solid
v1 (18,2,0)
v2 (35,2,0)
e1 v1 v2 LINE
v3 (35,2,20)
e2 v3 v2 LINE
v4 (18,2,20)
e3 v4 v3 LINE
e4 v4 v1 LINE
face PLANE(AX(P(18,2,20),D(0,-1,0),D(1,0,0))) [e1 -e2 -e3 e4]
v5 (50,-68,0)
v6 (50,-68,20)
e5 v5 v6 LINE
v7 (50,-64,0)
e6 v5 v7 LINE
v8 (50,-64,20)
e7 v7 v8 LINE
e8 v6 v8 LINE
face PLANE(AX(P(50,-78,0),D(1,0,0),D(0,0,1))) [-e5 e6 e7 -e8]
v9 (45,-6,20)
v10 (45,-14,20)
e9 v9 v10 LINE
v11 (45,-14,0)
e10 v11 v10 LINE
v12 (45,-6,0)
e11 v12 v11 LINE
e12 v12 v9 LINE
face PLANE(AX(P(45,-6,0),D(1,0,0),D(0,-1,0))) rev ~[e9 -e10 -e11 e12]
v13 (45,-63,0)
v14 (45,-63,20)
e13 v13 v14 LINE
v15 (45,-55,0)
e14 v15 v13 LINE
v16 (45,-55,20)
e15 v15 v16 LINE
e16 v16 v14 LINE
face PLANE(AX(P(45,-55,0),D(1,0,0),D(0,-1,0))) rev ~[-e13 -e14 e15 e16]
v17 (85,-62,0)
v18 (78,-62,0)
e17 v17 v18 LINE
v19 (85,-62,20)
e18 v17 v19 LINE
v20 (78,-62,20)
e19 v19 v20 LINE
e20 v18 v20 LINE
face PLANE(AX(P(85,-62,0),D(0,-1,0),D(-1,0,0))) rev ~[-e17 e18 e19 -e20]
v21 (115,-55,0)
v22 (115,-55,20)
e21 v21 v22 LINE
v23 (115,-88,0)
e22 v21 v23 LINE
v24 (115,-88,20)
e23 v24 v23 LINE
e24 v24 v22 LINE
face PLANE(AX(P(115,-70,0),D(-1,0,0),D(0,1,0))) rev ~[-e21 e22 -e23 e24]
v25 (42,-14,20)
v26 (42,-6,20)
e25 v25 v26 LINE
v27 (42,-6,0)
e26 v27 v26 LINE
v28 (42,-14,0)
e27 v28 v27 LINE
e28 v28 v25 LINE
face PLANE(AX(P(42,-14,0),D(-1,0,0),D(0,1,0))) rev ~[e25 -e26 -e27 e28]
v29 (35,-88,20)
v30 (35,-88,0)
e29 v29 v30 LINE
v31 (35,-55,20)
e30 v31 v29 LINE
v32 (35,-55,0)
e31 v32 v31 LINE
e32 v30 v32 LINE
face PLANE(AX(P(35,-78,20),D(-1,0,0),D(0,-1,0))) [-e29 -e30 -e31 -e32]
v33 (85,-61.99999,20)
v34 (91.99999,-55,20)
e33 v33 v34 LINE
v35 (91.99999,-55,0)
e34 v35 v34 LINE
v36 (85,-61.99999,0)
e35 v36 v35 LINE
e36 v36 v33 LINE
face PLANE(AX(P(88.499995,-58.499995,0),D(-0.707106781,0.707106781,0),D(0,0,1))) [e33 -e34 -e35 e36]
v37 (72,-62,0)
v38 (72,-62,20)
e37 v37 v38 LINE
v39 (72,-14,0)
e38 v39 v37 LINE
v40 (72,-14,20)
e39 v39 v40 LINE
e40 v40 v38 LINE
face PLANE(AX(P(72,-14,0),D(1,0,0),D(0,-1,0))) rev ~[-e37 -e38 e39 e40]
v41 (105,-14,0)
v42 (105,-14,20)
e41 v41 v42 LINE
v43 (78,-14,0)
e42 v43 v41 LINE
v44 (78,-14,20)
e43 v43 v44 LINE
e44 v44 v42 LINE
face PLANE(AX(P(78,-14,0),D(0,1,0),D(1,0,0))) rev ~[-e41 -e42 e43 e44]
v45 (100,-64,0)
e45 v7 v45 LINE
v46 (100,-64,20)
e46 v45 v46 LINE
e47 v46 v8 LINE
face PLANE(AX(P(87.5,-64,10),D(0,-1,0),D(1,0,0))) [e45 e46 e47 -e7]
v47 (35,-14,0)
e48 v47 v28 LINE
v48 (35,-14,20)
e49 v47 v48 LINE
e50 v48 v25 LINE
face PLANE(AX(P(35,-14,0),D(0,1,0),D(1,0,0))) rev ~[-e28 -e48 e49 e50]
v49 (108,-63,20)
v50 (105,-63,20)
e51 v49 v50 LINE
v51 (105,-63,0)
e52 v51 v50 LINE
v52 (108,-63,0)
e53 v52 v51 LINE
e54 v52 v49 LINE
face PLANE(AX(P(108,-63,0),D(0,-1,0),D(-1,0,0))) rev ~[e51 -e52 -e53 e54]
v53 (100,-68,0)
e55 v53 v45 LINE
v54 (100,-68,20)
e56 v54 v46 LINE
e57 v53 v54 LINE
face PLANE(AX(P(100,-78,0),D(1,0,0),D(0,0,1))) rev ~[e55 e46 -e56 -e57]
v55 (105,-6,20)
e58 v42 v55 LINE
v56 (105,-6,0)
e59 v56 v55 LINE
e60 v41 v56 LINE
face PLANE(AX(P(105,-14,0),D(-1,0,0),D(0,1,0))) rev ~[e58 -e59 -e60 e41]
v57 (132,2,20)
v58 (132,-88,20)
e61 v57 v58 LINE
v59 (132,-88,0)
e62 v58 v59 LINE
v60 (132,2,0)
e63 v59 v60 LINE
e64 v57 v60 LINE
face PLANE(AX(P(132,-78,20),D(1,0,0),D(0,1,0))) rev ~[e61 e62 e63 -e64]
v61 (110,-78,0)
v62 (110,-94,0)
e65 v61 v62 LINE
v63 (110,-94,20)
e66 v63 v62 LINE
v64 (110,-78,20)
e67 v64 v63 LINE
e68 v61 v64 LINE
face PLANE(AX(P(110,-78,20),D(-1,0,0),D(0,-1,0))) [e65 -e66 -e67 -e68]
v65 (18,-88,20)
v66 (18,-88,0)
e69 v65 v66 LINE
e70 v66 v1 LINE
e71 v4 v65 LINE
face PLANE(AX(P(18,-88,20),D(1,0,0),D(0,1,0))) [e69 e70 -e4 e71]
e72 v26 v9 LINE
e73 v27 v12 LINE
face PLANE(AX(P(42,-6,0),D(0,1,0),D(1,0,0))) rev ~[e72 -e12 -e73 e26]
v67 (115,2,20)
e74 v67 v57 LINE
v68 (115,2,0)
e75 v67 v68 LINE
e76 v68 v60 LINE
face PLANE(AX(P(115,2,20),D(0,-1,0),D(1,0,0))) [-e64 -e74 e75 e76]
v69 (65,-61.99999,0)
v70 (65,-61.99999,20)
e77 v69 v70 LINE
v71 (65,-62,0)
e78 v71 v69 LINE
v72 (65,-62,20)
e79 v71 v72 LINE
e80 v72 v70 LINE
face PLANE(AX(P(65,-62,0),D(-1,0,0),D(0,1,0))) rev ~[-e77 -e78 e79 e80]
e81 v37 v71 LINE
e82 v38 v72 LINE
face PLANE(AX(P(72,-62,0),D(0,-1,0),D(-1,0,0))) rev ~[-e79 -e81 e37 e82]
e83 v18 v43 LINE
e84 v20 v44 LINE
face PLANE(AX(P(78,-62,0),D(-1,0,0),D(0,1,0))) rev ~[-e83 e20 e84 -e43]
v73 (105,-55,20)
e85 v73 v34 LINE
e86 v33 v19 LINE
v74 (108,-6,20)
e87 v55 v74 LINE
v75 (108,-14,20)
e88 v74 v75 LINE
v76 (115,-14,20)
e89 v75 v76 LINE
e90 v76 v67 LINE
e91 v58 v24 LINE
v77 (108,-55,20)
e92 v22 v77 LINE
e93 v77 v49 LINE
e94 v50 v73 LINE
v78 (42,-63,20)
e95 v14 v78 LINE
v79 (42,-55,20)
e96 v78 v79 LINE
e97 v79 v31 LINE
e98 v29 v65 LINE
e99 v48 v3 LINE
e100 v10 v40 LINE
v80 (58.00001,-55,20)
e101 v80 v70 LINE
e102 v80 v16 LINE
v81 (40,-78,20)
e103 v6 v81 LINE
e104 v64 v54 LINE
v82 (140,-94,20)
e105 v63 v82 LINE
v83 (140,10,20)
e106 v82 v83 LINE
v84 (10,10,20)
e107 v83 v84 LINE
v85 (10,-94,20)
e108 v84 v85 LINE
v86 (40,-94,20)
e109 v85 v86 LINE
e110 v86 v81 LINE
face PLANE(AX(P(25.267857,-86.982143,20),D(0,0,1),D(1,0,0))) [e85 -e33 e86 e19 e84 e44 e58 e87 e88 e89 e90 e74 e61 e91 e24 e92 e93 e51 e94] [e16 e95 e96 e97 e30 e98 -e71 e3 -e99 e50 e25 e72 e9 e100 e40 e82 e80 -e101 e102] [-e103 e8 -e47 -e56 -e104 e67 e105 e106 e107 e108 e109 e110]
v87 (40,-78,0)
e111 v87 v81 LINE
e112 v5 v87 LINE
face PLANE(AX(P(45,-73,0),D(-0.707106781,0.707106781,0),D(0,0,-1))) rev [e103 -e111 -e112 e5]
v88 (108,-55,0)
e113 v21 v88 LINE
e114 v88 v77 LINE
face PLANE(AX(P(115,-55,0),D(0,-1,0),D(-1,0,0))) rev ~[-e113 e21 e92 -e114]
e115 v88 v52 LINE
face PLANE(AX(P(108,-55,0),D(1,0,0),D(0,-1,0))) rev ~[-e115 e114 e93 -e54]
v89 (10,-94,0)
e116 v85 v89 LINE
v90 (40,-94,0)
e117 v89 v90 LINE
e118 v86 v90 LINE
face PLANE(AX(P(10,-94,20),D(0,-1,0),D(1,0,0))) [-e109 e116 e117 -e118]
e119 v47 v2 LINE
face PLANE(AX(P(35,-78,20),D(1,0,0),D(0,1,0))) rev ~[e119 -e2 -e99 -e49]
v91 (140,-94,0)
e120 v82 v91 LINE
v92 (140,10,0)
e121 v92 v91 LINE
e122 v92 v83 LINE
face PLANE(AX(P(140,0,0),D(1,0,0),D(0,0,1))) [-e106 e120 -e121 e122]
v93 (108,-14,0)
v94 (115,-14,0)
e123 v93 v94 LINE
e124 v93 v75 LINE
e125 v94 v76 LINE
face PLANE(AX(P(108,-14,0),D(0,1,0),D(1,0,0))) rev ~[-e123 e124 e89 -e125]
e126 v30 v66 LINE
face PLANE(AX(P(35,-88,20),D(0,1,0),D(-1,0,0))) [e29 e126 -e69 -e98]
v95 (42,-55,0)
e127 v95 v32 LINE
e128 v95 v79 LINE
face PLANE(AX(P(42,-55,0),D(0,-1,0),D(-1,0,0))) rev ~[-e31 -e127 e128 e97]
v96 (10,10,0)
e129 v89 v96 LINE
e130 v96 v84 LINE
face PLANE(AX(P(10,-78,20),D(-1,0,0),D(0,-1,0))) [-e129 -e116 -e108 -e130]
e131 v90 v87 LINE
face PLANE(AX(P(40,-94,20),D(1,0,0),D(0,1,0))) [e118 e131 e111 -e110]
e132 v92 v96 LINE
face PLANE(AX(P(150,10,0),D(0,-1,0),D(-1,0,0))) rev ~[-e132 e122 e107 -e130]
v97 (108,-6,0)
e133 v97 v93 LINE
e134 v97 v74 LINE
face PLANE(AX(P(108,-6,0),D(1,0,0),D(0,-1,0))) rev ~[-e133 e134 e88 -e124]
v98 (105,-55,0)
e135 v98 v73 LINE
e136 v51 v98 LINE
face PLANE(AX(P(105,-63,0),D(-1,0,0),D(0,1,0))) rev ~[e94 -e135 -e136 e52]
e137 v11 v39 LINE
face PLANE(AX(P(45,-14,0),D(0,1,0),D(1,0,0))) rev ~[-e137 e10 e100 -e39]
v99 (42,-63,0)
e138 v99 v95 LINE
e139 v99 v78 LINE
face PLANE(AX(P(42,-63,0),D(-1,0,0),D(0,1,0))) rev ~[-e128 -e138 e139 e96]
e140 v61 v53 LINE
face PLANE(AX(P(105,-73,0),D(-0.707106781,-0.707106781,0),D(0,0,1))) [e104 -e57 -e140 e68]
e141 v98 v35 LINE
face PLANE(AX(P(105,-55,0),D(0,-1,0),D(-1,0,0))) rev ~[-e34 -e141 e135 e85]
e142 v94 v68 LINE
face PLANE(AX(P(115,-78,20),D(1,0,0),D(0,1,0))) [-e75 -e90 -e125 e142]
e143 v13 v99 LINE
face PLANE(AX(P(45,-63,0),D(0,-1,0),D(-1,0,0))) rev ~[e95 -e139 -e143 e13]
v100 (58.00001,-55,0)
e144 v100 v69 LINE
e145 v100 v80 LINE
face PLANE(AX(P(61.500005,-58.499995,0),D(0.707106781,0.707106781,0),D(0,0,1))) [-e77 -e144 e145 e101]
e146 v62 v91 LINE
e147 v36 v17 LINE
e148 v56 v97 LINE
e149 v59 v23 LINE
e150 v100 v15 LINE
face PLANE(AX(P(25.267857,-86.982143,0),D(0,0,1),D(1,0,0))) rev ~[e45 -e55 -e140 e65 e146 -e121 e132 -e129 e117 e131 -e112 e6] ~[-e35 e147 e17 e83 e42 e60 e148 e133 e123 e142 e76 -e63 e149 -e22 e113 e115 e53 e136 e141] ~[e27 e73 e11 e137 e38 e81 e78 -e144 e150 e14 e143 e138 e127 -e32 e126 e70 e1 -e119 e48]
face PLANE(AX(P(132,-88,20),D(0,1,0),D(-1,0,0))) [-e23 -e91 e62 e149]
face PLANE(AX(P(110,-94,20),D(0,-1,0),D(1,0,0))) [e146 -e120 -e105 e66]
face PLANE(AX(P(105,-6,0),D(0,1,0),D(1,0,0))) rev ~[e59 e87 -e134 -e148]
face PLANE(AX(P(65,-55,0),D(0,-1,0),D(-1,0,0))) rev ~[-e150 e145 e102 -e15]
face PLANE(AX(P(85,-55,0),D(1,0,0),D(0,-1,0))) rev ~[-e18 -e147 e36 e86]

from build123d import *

# Parameters (mm, degrees)
F1_DEPTH  = 20
F2_DEPTH  = 12
F3_DEPTH  = 10
F4_DEPTH  = 10
F5_W      = 25
F5_H      = 20
F6_DEPTH  = 14
F7_SIZE   = 10
F8_SIZE   = 6.99999
F9_DEPTH  = 10
F10_W     = 17
F10_H     = 80
F11_DEPTH = 20.001
F13_DEPTH = 20


# Not quite as in the source:
# - a fillet or chamfer is up to 0.001 mm smaller than in the source, because OpenCascade refuses the exact size
# - a feature names something its author has since deleted; it is built from what else it names


with BuildPart() as f1:
    # F0 (on Top) → F1 (new body)
    with BuildSketch(Plane.XY):
        Polygon((78, -43.2), (75, -45), (78, -45), align=None)
        Polygon((33.3333333333, -20), (0, 0), (0, -90), (33.3333333333, -70), (25, -70), (25, -20), align=None)
        Polygon((150, -90), (150, 0), (116.6666666667, -20), (125, -20), (125, -70), (116.6666666667, -70), align=None)
        Polygon((75, 0), (0, 0), (33.3333333333, -20), (35, -20), (35, -14), (42, -14), (42, -6), (45, -6), (45, -14), (72, -14), (72, -43.2), (75, -45), align=None)
        Polygon((150, 0), (75, 0), (75, -45), (78, -43.2), (78, -14), (105, -14), (105, -6), (108, -6), (108, -14), (115, -14), (115, -20), (116.6666666667, -20), align=None)
        Polygon((78, -45), (75, -45), (78, -46.8), align=None)
        Polygon((72, -45), (75, -45), (72, -43.2), align=None)
        Polygon((72, -46.8), (75, -45), (72, -45), align=None)
        Polygon((78, -46.8), (75, -45), (75, -90), (150, -90), (116.6666666667, -70), (115, -70), (115, -69), (105, -63), (91.6666666667, -55), (85, -55), (85, -62), (78, -62), (78, -55), (78, -48), align=None)
        Polygon((33.3333333333, -70), (0, -90), (75, -90), (75, -45), (72, -46.8), (72, -48), (72, -55), (72, -62), (65, -62), (65, -55), (58.3333333333, -55), (45, -63), (35, -69), (35, -70), align=None)
        Polygon((35, -55), (35, -69), (45, -63), (42, -63), (42, -55), align=None)
        Polygon((45, -63), (58.3333333333, -55), (45, -55), align=None)
        Polygon((105, -55), (91.6666666667, -55), (105, -63), align=None)
        Polygon((105, -63), (115, -69), (115, -55), (108, -55), (108, -63), align=None)
    extrude(amount=F1_DEPTH)

    # F2 (cut): a face of the model
    f2_faces = [f1.faces().sort_by_distance(p)[0] for p in [
        (75, -90, 10),
    ]]
    extrude(f2_faces, amount=-F2_DEPTH, mode=Mode.SUBTRACT)

    # F3 (cut): a face of the model
    f3_faces = [f1.faces().sort_by_distance(p)[0] for p in [
        (150, -39, 10),
    ]]
    extrude(f3_faces, amount=-F3_DEPTH, mode=Mode.SUBTRACT)

    # F4 (cut): a face of the model
    f4_faces = [f1.faces().sort_by_distance(p)[0] for p in [
        (0, -39, 10),
    ]]
    extrude(f4_faces, amount=-F4_DEPTH, mode=Mode.SUBTRACT)

    # F5 (on face) → F6 (cut)
    with BuildSketch(Plane.XZ.offset(78)):
        with Locations((87.5, 10)):
            Rectangle(F5_W, F5_H)
        with Locations((62.5, 10)):
            Rectangle(F5_W, F5_H)
    extrude(amount=-F6_DEPTH, mode=Mode.SUBTRACT)

    # F7
    f7_edges = [f1.edges().sort_by_distance(p)[0] for p in [
        (100, -78, 10),
        (50, -78, 10),
    ]]
    chamfer(f7_edges, length=F7_SIZE)

    # F8 (size 7 in the source; OpenCascade refuses exactly that, so slightly less here)
    f8_edges = [f1.edges().sort_by_distance(p)[0] for p in [
        (85, -55, 10),
        (65, -55, 10),
    ]]
    chamfer(f8_edges, length=F8_SIZE)

    # F9 (add): a face of the model
    f9_faces = [f1.faces().sort_by_distance(p)[0] for p in [
        (75, 0, 10),
    ]]
    extrude(f9_faces, amount=F9_DEPTH)

    # F10 (on face) → F11 (cut, through all)
    with BuildSketch(Plane.XY.offset(20)):
        with Locations((26.5, -38)):
            Rectangle(F10_W, F10_H)
        with Locations((123.5, -38)):
            Rectangle(F10_W, F10_H)
    extrude(amount=-F11_DEPTH, mode=Mode.SUBTRACT)

    # F12 (on face) → F13 (join)
    with BuildSketch(Plane.XY.offset(20)):
        Polygon((18, -88), (18, -78), (10, -78), (10, -94), (40, -94), (40, -78), (35, -78), (35, -88), align=None)
        Polygon((140, -94), (140, -78), (132, -78), (132, -88), (115, -88), (115, -78), (110, -78), (110, -94), align=None)
    extrude(amount=-F13_DEPTH)


solid = f1.part
